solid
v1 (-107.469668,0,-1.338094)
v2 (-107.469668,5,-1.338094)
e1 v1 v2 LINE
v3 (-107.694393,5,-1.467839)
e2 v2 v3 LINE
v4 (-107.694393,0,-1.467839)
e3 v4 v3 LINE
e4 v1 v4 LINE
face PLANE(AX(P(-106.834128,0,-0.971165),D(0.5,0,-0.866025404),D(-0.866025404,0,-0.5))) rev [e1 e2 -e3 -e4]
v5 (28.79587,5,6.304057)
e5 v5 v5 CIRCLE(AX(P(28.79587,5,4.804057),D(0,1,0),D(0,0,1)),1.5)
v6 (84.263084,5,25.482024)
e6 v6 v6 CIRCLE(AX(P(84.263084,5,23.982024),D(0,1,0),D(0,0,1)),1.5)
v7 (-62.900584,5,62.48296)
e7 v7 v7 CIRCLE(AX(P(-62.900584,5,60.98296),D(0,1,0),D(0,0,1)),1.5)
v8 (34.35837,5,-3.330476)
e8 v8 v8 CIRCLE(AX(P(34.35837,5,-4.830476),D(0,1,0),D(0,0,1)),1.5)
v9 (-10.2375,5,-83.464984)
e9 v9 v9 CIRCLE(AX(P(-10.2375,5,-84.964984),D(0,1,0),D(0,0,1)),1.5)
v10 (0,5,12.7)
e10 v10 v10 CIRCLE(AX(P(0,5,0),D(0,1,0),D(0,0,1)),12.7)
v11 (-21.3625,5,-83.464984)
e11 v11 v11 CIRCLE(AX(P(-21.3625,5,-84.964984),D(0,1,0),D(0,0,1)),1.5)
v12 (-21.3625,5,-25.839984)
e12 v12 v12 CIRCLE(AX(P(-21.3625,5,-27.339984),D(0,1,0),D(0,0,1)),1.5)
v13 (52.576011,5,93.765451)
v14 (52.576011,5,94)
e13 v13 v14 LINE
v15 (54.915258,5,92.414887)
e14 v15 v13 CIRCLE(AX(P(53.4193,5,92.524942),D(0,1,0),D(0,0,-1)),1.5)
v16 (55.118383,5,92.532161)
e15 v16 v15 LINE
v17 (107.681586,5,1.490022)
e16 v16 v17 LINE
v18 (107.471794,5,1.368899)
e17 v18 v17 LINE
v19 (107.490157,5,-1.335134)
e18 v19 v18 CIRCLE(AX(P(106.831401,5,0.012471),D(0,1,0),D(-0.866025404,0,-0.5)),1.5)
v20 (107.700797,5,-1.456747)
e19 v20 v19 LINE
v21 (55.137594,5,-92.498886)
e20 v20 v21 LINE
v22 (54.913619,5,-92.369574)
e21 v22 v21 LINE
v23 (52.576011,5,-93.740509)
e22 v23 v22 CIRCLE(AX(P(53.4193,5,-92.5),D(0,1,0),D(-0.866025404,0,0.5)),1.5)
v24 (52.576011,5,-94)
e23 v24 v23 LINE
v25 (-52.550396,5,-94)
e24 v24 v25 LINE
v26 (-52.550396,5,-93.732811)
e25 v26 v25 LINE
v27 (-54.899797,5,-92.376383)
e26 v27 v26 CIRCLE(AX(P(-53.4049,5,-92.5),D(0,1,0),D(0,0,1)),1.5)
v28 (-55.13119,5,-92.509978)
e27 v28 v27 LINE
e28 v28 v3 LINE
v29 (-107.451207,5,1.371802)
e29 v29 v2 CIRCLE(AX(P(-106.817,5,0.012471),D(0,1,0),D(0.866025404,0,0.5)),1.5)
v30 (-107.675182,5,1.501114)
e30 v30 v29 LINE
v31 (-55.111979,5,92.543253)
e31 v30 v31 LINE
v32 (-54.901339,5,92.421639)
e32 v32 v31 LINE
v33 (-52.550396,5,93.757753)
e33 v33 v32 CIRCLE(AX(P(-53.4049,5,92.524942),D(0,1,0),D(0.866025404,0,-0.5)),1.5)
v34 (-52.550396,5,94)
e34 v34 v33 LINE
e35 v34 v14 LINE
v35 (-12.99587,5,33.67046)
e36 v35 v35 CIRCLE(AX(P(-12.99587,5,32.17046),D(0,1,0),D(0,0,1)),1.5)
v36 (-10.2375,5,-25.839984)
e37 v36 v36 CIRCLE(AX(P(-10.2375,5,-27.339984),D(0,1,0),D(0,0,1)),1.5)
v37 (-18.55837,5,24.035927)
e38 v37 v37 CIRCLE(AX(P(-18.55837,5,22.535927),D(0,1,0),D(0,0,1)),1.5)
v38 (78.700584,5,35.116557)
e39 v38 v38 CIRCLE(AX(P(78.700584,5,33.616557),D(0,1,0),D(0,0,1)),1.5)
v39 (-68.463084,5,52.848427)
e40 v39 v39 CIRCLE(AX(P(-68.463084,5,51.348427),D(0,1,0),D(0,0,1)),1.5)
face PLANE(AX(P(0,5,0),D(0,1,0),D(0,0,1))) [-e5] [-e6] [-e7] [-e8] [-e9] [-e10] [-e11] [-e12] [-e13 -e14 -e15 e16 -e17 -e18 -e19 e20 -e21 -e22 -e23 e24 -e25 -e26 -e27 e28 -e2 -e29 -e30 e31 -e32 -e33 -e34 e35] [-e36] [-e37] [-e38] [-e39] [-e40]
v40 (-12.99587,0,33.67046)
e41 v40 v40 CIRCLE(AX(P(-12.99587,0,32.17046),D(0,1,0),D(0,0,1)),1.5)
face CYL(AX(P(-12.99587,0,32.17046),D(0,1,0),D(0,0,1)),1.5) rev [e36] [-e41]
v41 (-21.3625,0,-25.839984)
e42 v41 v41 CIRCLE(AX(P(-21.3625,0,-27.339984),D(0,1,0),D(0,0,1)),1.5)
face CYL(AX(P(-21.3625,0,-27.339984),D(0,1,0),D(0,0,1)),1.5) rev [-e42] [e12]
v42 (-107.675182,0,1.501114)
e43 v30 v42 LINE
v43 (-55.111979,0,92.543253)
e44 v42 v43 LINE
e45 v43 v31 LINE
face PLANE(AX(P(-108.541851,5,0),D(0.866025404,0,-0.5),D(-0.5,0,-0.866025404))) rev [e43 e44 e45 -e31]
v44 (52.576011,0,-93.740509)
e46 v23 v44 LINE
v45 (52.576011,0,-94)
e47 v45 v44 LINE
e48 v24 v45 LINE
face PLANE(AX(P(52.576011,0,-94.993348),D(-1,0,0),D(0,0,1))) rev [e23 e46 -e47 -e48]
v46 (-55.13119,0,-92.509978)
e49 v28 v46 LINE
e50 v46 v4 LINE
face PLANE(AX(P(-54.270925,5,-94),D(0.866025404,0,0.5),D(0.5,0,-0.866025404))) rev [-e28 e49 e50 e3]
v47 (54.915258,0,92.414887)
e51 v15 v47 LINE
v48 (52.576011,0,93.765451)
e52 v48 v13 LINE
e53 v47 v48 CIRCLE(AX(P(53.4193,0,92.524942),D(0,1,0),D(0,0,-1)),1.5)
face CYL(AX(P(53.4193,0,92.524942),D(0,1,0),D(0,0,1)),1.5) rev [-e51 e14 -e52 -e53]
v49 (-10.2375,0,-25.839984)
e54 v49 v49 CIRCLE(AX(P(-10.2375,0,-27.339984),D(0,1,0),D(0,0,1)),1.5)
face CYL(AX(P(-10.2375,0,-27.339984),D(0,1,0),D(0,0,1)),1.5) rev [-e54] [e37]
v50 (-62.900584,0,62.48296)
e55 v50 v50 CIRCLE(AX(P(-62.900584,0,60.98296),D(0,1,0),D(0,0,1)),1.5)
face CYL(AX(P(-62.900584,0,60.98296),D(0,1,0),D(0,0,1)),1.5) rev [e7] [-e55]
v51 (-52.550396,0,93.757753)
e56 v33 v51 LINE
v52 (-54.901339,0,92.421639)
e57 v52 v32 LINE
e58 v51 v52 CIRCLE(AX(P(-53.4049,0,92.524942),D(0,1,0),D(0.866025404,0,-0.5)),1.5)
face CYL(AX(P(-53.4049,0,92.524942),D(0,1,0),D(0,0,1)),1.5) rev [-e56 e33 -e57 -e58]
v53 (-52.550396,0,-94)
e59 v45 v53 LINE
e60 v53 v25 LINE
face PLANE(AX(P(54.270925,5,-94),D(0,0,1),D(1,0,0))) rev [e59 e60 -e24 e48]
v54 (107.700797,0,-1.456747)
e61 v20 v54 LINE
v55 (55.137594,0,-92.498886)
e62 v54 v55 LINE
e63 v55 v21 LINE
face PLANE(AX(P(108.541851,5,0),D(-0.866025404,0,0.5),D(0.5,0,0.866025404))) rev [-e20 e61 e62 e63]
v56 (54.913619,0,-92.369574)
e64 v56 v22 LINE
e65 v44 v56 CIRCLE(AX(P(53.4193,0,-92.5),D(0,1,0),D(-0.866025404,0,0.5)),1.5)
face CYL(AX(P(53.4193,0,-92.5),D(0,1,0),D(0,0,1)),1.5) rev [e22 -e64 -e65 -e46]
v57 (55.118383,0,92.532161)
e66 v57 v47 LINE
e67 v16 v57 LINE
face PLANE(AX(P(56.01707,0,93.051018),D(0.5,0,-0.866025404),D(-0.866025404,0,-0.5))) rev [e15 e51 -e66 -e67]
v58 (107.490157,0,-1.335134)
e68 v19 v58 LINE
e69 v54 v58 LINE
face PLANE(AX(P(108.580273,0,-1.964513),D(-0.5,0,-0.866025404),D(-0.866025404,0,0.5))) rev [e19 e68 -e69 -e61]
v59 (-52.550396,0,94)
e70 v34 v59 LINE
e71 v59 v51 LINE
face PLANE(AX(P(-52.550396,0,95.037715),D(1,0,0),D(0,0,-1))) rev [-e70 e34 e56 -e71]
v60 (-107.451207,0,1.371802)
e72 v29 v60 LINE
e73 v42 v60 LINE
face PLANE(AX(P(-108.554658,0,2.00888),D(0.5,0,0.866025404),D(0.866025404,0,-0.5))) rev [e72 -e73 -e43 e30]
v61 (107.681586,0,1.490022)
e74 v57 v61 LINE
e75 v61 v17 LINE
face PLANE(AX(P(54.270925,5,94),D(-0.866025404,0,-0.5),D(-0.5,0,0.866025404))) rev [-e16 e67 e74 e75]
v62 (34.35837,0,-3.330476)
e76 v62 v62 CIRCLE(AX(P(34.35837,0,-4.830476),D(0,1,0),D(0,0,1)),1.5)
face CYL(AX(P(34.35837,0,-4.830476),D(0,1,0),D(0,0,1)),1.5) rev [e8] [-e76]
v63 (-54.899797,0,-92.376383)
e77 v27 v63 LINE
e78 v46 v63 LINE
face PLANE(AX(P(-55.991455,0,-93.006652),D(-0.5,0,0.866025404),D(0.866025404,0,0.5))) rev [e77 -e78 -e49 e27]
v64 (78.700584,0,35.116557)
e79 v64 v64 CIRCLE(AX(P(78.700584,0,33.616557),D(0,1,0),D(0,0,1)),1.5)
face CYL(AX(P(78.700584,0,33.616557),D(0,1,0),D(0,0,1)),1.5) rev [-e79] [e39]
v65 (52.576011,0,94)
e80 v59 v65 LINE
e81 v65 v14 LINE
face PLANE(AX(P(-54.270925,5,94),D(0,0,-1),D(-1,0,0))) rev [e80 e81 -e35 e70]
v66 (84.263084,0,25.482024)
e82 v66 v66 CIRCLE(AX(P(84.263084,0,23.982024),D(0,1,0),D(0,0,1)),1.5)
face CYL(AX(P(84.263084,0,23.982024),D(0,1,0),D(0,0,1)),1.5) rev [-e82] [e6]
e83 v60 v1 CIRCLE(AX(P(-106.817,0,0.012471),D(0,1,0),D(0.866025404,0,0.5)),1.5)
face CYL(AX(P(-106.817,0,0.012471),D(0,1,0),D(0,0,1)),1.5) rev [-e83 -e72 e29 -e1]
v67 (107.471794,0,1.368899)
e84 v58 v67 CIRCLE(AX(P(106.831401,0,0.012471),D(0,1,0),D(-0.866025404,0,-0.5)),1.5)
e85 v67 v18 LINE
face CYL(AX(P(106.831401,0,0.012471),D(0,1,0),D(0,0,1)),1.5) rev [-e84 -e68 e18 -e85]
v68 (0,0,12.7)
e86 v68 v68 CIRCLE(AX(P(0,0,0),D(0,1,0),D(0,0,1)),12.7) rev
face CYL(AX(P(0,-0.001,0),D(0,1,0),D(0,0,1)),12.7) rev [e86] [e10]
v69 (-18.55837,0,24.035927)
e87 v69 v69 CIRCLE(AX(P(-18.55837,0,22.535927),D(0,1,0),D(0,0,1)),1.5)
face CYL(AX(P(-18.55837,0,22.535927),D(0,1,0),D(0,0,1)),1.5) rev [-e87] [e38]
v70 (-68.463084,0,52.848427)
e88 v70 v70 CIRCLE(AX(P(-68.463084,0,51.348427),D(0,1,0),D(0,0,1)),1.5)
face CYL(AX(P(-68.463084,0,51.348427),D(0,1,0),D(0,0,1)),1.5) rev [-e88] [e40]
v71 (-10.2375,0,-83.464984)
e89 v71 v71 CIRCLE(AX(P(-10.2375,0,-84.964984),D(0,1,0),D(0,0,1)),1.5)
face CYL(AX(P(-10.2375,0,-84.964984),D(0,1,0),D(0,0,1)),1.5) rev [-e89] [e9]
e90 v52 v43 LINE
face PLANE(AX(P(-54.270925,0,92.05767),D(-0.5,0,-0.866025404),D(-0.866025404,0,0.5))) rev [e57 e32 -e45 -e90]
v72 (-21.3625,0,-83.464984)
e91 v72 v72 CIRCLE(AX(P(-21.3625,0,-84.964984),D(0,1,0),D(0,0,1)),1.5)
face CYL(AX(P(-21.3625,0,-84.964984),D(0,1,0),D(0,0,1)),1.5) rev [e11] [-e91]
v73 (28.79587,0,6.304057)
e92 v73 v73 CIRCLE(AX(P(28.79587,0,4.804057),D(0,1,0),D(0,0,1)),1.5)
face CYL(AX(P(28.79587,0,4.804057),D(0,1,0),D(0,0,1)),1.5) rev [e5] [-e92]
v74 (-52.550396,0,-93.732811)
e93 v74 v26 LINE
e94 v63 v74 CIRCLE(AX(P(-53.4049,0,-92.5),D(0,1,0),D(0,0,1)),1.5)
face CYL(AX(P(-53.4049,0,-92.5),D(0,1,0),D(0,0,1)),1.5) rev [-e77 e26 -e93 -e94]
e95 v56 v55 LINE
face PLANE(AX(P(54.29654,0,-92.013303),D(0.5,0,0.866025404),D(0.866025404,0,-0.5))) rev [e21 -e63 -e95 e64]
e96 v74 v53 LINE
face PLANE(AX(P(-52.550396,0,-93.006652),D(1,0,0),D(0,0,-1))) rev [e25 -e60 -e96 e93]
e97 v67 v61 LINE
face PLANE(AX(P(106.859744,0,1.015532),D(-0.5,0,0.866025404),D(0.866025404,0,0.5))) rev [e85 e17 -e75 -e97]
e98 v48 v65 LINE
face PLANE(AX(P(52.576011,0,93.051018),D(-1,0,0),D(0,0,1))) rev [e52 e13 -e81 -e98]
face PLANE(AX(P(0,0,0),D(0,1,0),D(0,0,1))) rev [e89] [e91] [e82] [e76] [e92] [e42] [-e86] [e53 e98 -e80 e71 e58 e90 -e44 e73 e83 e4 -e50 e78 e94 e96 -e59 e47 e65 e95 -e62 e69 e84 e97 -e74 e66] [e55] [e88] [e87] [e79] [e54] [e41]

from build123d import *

# Parameters (mm, degrees)
BOSS_EXTRUDE1_DEPTH = 5
CUT_EXTRUDE3_DEPTH  = 144.674400411
SKETCH7_R           = 1.5
CUT_EXTRUDE5_DEPTH  = 144.674400411
CIRPATTERN3_DEPTH   = 5
CUT_EXTRUDE6_REACH  = 145.04
SKETCH9_R           = 12.7
SKETCH10_R          = 1.5
CUT_EXTRUDE7_DEPTH  = 144.040070255


# Read off the part's stored shape, not the designer's step: CirPattern3
with BuildPart() as part:
    # Sketch1 → Boss-Extrude1 (new body)
    with BuildSketch(Plane(origin=(0, 0, 0), x_dir=(1, 0, 0), z_dir=(0, 1, 0))):
        Polygon((54.270925304, 94), (-54.270925304, 94), (-108.541850608, 0), (-54.270925304, -94), (54.270925304, -94), (108.541850608, 0), align=None)
    extrude(amount=BOSS_EXTRUDE1_DEPTH)

    # Sketch6 → Cut-Extrude3 (cut, through all)
    with BuildSketch(Plane(origin=(0, 5, 0), x_dir=(1, 0, 0), z_dir=(0, 1, 0))):
        Polygon((-52.550395529, 93.006651671), (-52.550395529, 94.993348329), (-54.270925304, 95.986696658), (-55.991455079, 94.993348329), (-55.991455079, 93.006651671), (-54.270925304, 92.013303342), align=None)
    extrude(amount=-CUT_EXTRUDE3_DEPTH, mode=Mode.SUBTRACT)

    # Sketch7 → Cut-Extrude5 (cut, through all)
    with BuildSketch(Plane(origin=(0, 5, 0), x_dir=(1, 0, 0), z_dir=(0, 1, 0))):
        with Locations((-53.4048999, 92.5)):
            Circle(SKETCH7_R)
    extrude(amount=-CUT_EXTRUDE5_DEPTH, mode=Mode.SUBTRACT)

    # CirPattern3 outline → CirPattern3 (cut)
    with BuildSketch(Plane(origin=(0, 0, 0), x_dir=(1, 0, 0), z_dir=(0, 1, 0))):
        with BuildLine():
            ThreePointArc((107.490156817, 1.335134155), (105.331435102, -0.002284917), (107.471793734, -1.368899034))
            Line((107.471793734, -1.368899034), (107.68158572, -1.490022493))
            Line((107.68158572, -1.490022493), (108.541850608, 0))
            Line((108.541850608, 0), (107.700797112, 1.456747386))
            Line((107.700797112, 1.456747386), (107.490156817, 1.335134155))
        make_face()
        with BuildLine():
            Line((54.913619301, 92.369573958), (55.137593989, 92.498885804))
            Line((55.137593989, 92.498885804), (54.270925304, 94))
            Line((54.270925304, 94), (52.576010718, 94))
            Line((52.576010718, 94), (52.576010718, 93.740508989))
            ThreePointArc((52.576010718, 93.740508989), (52.660468715, 91.206101044), (54.913619301, 92.369573958))
        make_face()
        with BuildLine():
            Line((-108.541850608, 0), (-107.675181923, -1.501114196))
            Line((-107.675181923, -1.501114196), (-107.451207235, -1.37180235))
            ThreePointArc((-107.451207235, -1.37180235), (-105.317034842, -0.002253161), (-107.469667507, 1.338093583))
            Line((-107.469667507, 1.338093583), (-107.694393315, 1.467839088))
            Line((-107.694393315, 1.467839088), (-108.541850608, 0))
        make_face()
        with BuildLine():
            Line((-54.270925304, -94), (-52.550395529, -94))
            Line((-52.550395529, -94), (-52.550395529, -93.757753081))
            ThreePointArc((-52.550395529, -93.757753081), (-52.663738755, -91.220841074), (-54.901338504, -92.421639383))
            Line((-54.901338504, -92.421639383), (-55.111978799, -92.543252614))
            Line((-55.111978799, -92.543252614), (-54.270925304, -94))
        make_face()
        with BuildLine():
            Line((54.270925304, -94), (55.118382597, -92.532160912))
            Line((55.118382597, -92.532160912), (54.915257504, -92.414886585))
            ThreePointArc((54.915257504, -92.414886585), (52.669300376, -91.225904252), (52.576010718, -93.765451347))
            Line((52.576010718, -93.765451347), (52.576010718, -94))
            Line((52.576010718, -94), (54.270925304, -94))
        make_face()
    extrude(amount=CIRPATTERN3_DEPTH, mode=Mode.SUBTRACT)

    # Sketch9 → Cut-Extrude6 (cut, up to next)
    with BuildSketch(Plane(origin=(0, 5, 0), x_dir=(1, 0, 0), z_dir=(0, 1, 0)), mode=Mode.PRIVATE) as cut_extrude6_sk1:
        with Locations(Location((0, 0, 0), (0, 0, 270))):
            Circle(SKETCH9_R)
    cut_extrude6_tool1 = extrude(cut_extrude6_sk1.sketch, amount=-CUT_EXTRUDE6_REACH, mode=Mode.PRIVATE) & part.part
    add(cut_extrude6_tool1.solids().sort_by_distance((0, 5, 0))[0], mode=Mode.SUBTRACT)

    # Sketch10 → Cut-Extrude7 (cut, through all)
    with BuildSketch(Plane(origin=(0, 5, 0), x_dir=(1, 0, 0), z_dir=(0, 1, 0))):
        with Locations(Location((-68.463084387, -51.348426962, 0), (0, 0, 270))):
            Circle(SKETCH10_R)
        with Locations(Location((-10.2375, 84.964983782, 0), (0, 0, 270))):
            Circle(SKETCH10_R)
        with Locations(Location((-21.3625, 27.339983782, 0), (0, 0, 270))):
            Circle(SKETCH10_R)
        with Locations(Location((-10.2375, 27.339983782, 0), (0, 0, 270))):
            Circle(SKETCH10_R)
        with Locations(Location((-21.3625, 84.964983782, 0), (0, 0, 270))):
            Circle(SKETCH10_R)
        with Locations(Location((28.795870494, -4.80405682, 0), (0, 0, 270))):
            Circle(SKETCH10_R)
        with Locations(Location((34.358370494, 4.830475797, 0), (0, 0, 270))):
            Circle(SKETCH10_R)
        with Locations(Location((84.263084387, -23.982024203, 0), (0, 0, 270))):
            Circle(SKETCH10_R)
        with Locations(Location((78.700584387, -33.61655682, 0), (0, 0, 270))):
            Circle(SKETCH10_R)
        with Locations(Location((-12.995870494, -32.170459579, 0), (0, 0, 270))):
            Circle(SKETCH10_R)
        with Locations(Location((-18.558370494, -22.535926962, 0), (0, 0, 270))):
            Circle(SKETCH10_R)
        with Locations(Location((-62.900584387, -60.982959579, 0), (0, 0, 270))):
            Circle(SKETCH10_R)
    extrude(amount=-CUT_EXTRUDE7_DEPTH, mode=Mode.SUBTRACT)


solid = part.part
